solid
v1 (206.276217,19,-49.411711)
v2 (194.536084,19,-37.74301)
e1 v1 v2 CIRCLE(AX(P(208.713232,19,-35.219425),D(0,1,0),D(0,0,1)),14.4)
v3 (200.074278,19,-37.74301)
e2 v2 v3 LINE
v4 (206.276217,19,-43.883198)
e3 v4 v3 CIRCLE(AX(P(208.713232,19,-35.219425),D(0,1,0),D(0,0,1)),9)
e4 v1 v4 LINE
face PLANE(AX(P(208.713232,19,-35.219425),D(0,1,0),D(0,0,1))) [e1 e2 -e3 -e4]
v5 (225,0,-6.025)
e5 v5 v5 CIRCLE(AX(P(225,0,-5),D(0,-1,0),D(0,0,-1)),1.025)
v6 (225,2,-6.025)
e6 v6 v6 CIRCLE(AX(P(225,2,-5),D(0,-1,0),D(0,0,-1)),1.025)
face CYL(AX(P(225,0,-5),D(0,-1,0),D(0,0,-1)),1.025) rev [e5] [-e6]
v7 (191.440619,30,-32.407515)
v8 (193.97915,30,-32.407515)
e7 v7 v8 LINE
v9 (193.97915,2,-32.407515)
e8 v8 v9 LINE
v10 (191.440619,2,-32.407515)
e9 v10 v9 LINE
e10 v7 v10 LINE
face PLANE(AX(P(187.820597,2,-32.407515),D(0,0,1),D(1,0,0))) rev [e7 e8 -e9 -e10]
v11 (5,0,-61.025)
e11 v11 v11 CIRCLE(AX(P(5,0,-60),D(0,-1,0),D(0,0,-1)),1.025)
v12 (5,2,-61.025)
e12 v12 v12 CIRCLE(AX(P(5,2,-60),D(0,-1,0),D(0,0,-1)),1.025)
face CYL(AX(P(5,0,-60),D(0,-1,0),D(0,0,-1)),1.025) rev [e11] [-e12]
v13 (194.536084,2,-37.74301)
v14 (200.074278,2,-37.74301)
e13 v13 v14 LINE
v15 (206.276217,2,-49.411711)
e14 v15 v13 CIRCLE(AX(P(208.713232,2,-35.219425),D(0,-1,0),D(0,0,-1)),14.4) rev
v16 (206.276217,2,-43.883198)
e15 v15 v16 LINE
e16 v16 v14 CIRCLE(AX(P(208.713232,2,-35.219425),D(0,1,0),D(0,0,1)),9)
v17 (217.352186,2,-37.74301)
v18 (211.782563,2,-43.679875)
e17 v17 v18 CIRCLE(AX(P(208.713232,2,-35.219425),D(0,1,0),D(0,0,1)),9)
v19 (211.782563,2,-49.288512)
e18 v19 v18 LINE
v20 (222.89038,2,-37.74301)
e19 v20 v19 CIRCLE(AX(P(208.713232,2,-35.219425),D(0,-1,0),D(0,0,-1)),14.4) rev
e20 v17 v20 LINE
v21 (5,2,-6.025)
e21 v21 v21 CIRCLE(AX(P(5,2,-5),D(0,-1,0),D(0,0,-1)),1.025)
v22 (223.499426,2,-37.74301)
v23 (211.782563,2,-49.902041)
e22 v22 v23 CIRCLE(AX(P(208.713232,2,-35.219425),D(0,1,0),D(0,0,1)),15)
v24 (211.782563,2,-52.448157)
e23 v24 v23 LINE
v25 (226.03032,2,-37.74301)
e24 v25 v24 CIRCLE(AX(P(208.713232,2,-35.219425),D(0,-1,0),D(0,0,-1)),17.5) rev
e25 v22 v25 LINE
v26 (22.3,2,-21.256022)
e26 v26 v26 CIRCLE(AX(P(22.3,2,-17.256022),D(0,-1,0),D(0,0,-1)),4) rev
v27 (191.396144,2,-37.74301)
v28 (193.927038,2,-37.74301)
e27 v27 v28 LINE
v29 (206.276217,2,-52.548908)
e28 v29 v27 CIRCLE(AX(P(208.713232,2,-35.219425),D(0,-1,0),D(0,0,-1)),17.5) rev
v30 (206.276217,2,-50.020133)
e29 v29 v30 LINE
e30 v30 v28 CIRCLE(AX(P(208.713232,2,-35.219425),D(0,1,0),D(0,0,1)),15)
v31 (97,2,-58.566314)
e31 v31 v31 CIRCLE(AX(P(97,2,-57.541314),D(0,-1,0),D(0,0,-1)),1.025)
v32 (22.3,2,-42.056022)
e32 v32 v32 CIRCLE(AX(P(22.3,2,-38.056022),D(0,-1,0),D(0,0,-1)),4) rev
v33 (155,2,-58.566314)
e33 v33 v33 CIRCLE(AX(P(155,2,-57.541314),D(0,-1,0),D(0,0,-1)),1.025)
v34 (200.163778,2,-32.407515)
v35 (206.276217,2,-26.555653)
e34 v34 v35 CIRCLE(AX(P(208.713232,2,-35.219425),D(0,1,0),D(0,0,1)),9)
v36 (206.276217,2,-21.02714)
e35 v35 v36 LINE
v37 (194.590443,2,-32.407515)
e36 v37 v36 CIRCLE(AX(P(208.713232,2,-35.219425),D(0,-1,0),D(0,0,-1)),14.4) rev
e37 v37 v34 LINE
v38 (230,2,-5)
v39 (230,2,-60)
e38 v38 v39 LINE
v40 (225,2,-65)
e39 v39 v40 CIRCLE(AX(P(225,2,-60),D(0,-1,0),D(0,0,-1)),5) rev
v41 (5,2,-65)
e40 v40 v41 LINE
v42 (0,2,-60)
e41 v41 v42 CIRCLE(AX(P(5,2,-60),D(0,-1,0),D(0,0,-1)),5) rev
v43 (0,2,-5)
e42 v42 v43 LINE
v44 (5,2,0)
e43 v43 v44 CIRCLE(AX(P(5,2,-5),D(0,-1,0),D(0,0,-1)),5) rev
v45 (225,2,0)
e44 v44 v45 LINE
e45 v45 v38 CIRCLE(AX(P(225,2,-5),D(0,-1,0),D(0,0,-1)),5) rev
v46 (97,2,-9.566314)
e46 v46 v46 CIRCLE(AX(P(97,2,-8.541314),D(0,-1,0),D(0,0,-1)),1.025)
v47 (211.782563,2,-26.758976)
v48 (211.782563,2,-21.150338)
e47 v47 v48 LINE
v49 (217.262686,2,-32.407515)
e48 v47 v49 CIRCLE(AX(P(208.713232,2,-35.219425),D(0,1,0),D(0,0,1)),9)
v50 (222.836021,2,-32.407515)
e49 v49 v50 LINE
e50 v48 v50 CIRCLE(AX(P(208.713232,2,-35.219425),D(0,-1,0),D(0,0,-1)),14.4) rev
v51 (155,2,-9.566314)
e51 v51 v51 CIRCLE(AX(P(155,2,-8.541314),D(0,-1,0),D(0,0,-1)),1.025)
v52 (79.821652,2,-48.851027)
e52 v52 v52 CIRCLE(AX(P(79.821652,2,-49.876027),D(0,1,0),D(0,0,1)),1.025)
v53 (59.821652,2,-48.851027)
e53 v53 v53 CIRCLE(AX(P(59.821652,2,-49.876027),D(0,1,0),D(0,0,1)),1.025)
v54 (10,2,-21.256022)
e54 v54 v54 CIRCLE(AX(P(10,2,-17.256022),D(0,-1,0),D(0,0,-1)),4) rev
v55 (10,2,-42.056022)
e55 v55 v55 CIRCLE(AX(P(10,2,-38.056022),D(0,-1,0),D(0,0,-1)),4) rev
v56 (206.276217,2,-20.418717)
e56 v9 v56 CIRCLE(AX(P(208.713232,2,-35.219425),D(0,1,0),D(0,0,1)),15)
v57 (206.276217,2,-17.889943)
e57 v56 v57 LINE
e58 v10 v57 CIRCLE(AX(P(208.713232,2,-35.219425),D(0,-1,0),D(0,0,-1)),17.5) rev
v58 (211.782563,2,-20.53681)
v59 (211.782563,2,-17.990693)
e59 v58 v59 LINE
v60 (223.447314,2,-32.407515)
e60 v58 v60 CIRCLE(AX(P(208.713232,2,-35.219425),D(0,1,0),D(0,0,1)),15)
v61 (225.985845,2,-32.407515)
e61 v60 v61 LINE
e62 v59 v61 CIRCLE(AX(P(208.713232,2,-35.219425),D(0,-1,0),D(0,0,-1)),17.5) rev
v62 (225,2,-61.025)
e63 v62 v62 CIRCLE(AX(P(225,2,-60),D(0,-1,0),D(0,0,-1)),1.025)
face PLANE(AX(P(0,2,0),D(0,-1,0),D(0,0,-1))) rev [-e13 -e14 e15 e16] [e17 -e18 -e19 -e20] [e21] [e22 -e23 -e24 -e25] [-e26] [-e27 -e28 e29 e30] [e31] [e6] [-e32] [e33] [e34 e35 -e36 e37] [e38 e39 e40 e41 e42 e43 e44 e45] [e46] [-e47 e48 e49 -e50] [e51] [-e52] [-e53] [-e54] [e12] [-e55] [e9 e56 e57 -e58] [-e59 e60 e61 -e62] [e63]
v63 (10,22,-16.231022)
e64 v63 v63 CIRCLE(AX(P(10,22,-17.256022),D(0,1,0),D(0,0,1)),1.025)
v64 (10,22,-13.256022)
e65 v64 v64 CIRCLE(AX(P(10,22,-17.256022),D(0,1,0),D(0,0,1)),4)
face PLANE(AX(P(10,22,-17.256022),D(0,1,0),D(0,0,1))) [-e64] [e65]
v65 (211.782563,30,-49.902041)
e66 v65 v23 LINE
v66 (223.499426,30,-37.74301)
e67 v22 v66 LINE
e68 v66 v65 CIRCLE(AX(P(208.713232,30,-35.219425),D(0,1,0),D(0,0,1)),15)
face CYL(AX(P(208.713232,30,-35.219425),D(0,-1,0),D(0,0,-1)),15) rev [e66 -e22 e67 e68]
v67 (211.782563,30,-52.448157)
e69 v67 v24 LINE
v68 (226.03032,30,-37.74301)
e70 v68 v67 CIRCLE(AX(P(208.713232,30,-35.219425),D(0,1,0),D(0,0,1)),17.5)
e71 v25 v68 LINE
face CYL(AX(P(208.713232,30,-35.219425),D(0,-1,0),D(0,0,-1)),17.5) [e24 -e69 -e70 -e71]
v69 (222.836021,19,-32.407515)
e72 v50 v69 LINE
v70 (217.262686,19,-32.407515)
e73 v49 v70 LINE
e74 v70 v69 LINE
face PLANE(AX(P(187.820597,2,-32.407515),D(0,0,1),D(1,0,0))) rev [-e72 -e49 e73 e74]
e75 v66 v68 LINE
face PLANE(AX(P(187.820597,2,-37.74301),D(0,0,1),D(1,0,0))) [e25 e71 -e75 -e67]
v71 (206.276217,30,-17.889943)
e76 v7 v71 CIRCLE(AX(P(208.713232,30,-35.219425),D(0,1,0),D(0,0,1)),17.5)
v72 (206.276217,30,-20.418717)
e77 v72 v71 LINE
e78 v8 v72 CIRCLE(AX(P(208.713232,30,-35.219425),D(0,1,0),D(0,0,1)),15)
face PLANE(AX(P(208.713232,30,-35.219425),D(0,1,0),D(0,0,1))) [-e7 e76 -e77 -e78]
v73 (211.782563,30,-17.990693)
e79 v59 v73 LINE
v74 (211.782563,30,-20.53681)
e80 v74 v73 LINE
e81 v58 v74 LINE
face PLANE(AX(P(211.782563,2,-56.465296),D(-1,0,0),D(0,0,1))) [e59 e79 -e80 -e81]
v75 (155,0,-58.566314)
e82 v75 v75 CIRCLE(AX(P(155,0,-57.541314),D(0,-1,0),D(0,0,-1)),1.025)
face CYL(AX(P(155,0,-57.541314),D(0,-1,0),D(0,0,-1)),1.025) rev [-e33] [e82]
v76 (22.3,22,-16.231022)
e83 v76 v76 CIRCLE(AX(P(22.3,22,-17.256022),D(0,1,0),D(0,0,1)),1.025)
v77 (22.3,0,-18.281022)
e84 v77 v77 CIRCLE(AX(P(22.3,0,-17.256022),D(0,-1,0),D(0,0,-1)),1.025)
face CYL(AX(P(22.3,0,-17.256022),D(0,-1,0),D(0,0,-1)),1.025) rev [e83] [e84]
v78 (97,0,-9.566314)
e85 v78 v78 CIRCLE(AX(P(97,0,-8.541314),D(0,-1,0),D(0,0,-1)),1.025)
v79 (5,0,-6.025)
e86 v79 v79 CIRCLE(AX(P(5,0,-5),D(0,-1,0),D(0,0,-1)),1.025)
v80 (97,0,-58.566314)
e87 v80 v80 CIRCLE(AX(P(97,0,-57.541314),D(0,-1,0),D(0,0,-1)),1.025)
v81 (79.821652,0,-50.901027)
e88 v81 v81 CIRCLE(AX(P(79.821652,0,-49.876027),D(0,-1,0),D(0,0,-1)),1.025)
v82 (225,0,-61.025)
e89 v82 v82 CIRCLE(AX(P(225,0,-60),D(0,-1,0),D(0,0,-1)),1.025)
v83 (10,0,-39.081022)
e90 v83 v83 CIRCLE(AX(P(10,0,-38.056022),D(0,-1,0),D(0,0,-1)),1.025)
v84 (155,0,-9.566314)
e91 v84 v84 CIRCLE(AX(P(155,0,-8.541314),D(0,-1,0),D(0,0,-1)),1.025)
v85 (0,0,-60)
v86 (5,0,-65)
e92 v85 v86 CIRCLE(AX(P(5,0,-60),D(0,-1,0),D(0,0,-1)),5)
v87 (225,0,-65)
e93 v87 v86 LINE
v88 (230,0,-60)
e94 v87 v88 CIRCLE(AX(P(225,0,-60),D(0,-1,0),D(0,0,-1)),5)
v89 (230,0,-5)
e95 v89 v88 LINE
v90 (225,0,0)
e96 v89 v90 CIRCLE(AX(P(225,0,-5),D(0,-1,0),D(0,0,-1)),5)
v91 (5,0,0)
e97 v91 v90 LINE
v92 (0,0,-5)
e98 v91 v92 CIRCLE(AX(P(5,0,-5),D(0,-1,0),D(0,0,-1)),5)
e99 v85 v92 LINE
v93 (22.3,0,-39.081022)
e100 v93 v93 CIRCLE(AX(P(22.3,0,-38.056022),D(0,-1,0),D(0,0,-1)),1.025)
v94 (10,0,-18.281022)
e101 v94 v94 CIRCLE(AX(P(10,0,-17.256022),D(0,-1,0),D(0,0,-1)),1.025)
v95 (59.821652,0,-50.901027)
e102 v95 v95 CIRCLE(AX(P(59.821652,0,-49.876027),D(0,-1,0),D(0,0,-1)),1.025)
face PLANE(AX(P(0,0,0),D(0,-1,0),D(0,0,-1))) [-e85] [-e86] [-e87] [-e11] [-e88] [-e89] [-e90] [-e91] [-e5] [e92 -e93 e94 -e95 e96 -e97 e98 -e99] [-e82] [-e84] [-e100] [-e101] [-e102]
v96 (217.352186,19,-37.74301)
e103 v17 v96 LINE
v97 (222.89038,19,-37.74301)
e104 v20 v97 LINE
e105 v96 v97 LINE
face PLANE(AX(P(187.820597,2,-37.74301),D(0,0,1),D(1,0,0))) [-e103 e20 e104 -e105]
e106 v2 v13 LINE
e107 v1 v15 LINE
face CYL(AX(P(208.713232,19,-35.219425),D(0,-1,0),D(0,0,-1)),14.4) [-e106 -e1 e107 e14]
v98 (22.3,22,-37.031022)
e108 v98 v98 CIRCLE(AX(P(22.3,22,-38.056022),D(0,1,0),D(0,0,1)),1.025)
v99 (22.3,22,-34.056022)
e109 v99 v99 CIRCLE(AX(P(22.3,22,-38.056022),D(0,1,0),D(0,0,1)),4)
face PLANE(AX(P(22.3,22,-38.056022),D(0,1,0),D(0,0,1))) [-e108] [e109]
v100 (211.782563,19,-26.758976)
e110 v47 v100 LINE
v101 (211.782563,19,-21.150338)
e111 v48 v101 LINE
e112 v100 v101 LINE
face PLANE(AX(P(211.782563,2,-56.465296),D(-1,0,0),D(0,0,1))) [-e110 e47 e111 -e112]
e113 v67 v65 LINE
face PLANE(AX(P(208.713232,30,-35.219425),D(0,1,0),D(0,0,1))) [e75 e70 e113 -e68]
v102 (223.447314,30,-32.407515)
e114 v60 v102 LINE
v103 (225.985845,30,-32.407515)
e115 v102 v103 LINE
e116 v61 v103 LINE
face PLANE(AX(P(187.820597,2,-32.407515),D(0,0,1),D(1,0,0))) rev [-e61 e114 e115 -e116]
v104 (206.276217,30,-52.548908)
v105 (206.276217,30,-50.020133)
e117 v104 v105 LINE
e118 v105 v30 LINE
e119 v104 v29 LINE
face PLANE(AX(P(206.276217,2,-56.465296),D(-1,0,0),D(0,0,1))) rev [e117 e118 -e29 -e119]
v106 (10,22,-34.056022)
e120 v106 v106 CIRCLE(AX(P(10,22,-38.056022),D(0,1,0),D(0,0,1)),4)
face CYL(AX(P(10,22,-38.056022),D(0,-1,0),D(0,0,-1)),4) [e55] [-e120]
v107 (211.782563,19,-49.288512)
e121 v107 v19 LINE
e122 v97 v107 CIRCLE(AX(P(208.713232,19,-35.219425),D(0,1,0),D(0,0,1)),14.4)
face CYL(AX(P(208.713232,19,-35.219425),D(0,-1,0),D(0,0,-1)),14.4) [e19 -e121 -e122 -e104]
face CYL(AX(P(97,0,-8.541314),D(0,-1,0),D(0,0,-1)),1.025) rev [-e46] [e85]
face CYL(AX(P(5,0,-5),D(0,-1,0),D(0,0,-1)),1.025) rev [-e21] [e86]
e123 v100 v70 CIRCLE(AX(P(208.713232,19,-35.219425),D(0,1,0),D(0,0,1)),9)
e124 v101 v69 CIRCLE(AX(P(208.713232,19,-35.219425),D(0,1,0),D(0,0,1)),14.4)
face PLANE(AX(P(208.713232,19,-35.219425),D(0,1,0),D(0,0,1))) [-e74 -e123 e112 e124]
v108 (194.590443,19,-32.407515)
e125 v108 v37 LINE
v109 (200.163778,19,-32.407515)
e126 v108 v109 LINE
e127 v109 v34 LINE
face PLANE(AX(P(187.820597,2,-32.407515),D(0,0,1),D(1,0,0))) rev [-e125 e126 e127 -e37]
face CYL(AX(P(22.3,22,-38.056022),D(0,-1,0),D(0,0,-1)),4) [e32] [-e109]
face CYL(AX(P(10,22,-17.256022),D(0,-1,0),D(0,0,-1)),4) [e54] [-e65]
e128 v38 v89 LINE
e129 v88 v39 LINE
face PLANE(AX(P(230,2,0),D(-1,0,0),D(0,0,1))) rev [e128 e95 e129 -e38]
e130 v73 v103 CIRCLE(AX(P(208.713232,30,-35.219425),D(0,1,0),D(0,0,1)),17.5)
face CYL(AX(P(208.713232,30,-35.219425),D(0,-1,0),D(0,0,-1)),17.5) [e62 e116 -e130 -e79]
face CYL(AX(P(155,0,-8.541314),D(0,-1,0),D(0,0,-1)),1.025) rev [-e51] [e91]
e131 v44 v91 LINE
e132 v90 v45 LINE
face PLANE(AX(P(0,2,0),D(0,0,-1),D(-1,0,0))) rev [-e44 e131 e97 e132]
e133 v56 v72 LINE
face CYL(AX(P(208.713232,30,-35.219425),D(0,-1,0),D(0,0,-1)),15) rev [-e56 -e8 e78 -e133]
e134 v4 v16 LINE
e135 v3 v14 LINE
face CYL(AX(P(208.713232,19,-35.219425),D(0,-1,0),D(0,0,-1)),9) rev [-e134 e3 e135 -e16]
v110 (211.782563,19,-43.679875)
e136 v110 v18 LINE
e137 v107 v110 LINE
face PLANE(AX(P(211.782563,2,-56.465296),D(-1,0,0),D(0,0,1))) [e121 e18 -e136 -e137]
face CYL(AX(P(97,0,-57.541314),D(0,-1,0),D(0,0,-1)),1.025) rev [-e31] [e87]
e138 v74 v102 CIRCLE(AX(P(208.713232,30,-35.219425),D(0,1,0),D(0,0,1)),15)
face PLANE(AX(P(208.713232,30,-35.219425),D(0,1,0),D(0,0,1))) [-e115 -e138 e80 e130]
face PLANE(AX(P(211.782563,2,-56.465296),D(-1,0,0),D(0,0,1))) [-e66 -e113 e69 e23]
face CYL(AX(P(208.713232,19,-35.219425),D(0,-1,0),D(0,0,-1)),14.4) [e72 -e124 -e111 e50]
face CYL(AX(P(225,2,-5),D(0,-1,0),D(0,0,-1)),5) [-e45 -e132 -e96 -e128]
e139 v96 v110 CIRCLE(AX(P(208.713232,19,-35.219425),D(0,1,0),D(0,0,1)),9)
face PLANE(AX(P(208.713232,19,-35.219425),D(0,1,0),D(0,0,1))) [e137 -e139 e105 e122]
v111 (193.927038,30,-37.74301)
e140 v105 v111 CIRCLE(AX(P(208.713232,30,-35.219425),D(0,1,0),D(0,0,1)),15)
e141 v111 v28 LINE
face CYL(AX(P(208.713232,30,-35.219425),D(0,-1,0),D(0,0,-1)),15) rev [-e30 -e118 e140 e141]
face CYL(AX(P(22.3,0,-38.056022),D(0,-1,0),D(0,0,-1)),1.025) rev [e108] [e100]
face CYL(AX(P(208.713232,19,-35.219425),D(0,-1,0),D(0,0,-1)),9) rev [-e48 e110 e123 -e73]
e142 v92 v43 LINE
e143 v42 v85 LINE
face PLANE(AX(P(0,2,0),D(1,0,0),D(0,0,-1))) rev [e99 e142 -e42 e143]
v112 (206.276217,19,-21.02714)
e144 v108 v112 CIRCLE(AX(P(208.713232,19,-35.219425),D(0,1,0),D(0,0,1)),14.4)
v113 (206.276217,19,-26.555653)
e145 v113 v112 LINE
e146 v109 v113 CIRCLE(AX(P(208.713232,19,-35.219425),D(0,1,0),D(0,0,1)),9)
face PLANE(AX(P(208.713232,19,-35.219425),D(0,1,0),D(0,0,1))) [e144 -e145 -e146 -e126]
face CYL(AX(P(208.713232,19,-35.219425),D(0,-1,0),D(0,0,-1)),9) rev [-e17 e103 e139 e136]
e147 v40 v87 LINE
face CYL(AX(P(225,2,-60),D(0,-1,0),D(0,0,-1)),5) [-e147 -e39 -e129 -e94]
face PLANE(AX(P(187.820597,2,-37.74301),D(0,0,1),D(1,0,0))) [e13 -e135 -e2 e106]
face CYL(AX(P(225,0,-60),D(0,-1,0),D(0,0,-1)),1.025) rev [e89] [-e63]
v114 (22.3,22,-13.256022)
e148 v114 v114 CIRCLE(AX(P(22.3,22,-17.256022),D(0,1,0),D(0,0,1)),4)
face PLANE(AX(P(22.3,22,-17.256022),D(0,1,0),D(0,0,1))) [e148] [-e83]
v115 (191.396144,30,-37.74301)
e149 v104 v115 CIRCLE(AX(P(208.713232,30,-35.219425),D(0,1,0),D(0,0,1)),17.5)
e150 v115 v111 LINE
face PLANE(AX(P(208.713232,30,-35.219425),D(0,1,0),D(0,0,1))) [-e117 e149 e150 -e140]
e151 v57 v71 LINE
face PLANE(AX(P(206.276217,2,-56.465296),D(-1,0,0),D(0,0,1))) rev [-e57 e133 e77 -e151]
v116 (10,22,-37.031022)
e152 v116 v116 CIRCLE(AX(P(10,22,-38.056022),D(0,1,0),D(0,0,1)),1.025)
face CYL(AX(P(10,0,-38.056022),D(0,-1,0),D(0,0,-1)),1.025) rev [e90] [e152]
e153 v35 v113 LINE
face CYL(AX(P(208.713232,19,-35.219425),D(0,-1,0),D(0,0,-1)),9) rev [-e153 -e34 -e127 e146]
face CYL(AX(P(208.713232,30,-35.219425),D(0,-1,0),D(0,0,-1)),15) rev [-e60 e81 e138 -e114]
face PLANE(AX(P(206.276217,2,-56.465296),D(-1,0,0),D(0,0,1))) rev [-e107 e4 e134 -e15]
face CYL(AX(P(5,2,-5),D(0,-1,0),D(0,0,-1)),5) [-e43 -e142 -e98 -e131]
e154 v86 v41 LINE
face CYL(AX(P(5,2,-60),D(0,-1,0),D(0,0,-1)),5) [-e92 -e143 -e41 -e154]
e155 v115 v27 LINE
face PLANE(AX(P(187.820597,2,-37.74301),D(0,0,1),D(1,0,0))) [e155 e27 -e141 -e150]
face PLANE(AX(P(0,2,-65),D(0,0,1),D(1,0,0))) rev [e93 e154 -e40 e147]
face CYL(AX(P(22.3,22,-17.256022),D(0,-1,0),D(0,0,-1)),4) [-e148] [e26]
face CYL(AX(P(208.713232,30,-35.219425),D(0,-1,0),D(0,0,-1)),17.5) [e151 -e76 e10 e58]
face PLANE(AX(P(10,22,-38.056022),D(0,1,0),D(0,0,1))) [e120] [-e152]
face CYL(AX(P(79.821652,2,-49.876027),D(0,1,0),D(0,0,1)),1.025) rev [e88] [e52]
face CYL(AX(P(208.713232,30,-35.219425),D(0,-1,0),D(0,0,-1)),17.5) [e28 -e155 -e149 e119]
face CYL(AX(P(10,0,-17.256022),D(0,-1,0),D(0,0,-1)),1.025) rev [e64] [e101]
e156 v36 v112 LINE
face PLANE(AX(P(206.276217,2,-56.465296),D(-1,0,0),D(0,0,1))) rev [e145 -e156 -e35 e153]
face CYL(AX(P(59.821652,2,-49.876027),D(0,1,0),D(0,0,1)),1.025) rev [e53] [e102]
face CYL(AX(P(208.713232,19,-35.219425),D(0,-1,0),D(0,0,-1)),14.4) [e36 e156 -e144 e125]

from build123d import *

# Parameters (mm, degrees)
SKETCH1_W                   = 230
SKETCH1_H                   = 65
BOSS_EXTRUDE1_DEPTH         = 2
M2_5_TAPPED_HOLE1_D         = 2.05
M2_5_TAPPED_HOLE1_DEPTH     = 2.5
M2_5_TAPPED_HOLE1_TIP       = 0.615882135
M2_5_TAPPED_HOLE2_D         = 2.05
M2_5_TAPPED_HOLE2_DEPTH     = 6.35
M2_5_TAPPED_HOLE2_TIP       = 0.615882135
SKETCH12_R                  = 4
BOSS_EXTRUDE4_DEPTH         = 20
FILLET1_R                   = 5
M2_5_TAPPED_HOLE3_D         = 2.05
M2_5_TAPPED_HOLE3_DEPTH     = 6.35
M2_5_TAPPED_HOLE3_TIP       = 0.615882135
M2_5_START                  = 2
M2_5_TAPPED_HOLE4_OUTLINE_R = 1.025
M2_5_TAPPED_HOLE4_DEPTH     = 20
M2_5_TAPPED_HOLE4_2_DEPTH   = 17
M2_5_START_2                = 19
M2_5_TAPPED_HOLE4_3_DEPTH   = 11
M2_5_TAPPED_HOLE5_OUTLINE_R = 1.025
M2_5_TAPPED_HOLE5_DEPTH     = 2


# Read off the part's stored shape, not the designer's step: M2.5 Tapped Hole4, M2.5 Tapped Hole5
with BuildPart() as part:
    # Sketch1 → Boss-Extrude1 (new body)
    with BuildSketch(Plane(origin=(0, 0, 0), x_dir=(1, 0, 0), z_dir=(0, 1, 0))):
        with Locations((115, 32.5)):
            Rectangle(SKETCH1_W, SKETCH1_H)
    extrude(amount=BOSS_EXTRUDE1_DEPTH)

    # M2.5 Tapped Hole1
    with Locations(Plane(origin=(0, 0, 0), x_dir=(-1, 0, 0), z_dir=(0, -1, 0))):
        with Locations((-97, 8.54131446), (-97, 57.54131446), (-155, 57.54131446), (-155, 8.54131446)):
            Hole(M2_5_TAPPED_HOLE1_D / 2, depth=M2_5_TAPPED_HOLE1_DEPTH)
            with Locations((0, 0, -(M2_5_TAPPED_HOLE1_DEPTH + M2_5_TAPPED_HOLE1_TIP / 2))):  # 118° drill point
                Cone(0, M2_5_TAPPED_HOLE1_D / 2, M2_5_TAPPED_HOLE1_TIP, mode=Mode.SUBTRACT)

    # M2.5 Tapped Hole2
    with Locations(Plane(origin=(0, 0, 0), x_dir=(-1, 0, 0), z_dir=(0, -1, 0))):
        with Locations((-10, 17.256022479), (-22.3, 17.256022479), (-22.3, 38.056022479), (-10, 38.056022479)):
            Hole(M2_5_TAPPED_HOLE2_D / 2, depth=M2_5_TAPPED_HOLE2_DEPTH)
            with Locations((0, 0, -(M2_5_TAPPED_HOLE2_DEPTH + M2_5_TAPPED_HOLE2_TIP / 2))):  # 118° drill point
                Cone(0, M2_5_TAPPED_HOLE2_D / 2, M2_5_TAPPED_HOLE2_TIP, mode=Mode.SUBTRACT)

    # Sketch12 → Boss-Extrude4 (add)
    with BuildSketch(Plane(origin=(0, 2, 0), x_dir=(1, 0, 0), z_dir=(0, 1, 0))):
        with Locations(Location((10, 38.056022479, 0), (0, 0, 90))):
            Circle(SKETCH12_R)
        with Locations(Location((22.3, 38.056022479, 0), (0, 0, 90))):
            Circle(SKETCH12_R)
        with Locations(Location((10, 17.256022479, 0), (0, 0, 90))):
            Circle(SKETCH12_R)
        with Locations(Location((22.3, 17.256022479, 0), (0, 0, 90))):
            Circle(SKETCH12_R)
    extrude(amount=BOSS_EXTRUDE4_DEPTH)

    # Fillet1
    fillet1_edges = [part.edges().sort_by_distance(p)[0] for p in [
        (0, 1, -65),
        (230, 1, -65),
        (230, 1, 0),
        (0, 1, 0),
    ]]
    fillet(fillet1_edges, radius=FILLET1_R)

    # M2.5 Tapped Hole3
    with Locations(Plane(origin=(5, 0, -5), x_dir=(0, 0, -1), z_dir=(0, -1, 0))):
        with Locations((0, 0), (0, 220), (55, 220), (55, 0)):
            Hole(M2_5_TAPPED_HOLE3_D / 2, depth=M2_5_TAPPED_HOLE3_DEPTH)
            with Locations((0, 0, -(M2_5_TAPPED_HOLE3_DEPTH + M2_5_TAPPED_HOLE3_TIP / 2))):  # 118° drill point
                Cone(0, M2_5_TAPPED_HOLE3_D / 2, M2_5_TAPPED_HOLE3_TIP, mode=Mode.SUBTRACT)

    # M2.5 Tapped Hole4 outline → M2.5 Tapped Hole4 (cut)
    with BuildSketch(Plane(origin=(0, 0, 0), x_dir=(1, 0, 0), z_dir=(0, 1, 0)).offset(M2_5_START)):
        with Locations((10, 38.056022479)):
            Circle(M2_5_TAPPED_HOLE4_OUTLINE_R)
        with Locations((22.3, 38.056022479)):
            Circle(M2_5_TAPPED_HOLE4_OUTLINE_R)
        with Locations((22.3, 17.256022479)):
            Circle(M2_5_TAPPED_HOLE4_OUTLINE_R)
        with Locations((10, 17.256022479)):
            Circle(M2_5_TAPPED_HOLE4_OUTLINE_R)
    extrude(amount=M2_5_TAPPED_HOLE4_DEPTH, mode=Mode.SUBTRACT)

    # M2.5 Tapped Hole4 2 outline → M2.5 Tapped Hole4 2 (add)
    with BuildSketch(Plane(origin=(0, 0, 0), x_dir=(1, 0, 0), z_dir=(0, 1, 0)).offset(M2_5_START)):
        with BuildLine():
            ThreePointArc((211.782562929, 17.990693318), (221.179581033, 22.937725916), (225.985844998, 32.407515116))
            Line((225.985844998, 32.407515116), (223.447313577, 32.407515116))
            ThreePointArc((223.447313577, 32.407515116), (219.412240688, 24.706042811), (211.782562929, 20.536809526))
            Line((211.782562929, 20.536809526), (211.782562929, 17.990693318))
        make_face()
        with BuildLine():
            ThreePointArc((226.030319518, 37.74300987), (221.281519671, 47.396787308), (211.782562929, 52.448157384))
            Line((211.782562929, 52.448157384), (211.782562929, 49.902041176))
            ThreePointArc((211.782562929, 49.902041176), (219.514410141, 45.6278138), (223.499425569, 37.74300987))
            Line((223.499425569, 37.74300987), (226.030319518, 37.74300987))
        make_face()
        with BuildLine():
            ThreePointArc((206.276217111, 52.548907703), (196.36982105, 47.624674517), (191.39614442, 37.74300987))
            Line((191.39614442, 37.74300987), (193.927038369, 37.74300987))
            ThreePointArc((193.927038369, 37.74300987), (198.137709859, 45.857015872), (206.276217111, 50.020133394))
            Line((206.276217111, 50.020133394), (206.276217111, 52.548907703))
        make_face()
        with BuildLine():
            ThreePointArc((191.440618941, 32.407515116), (196.473651384, 22.711721041), (206.276217111, 17.889942999))
            Line((206.276217111, 17.889942999), (206.276217111, 20.418717308))
            ThreePointArc((206.276217111, 20.418717308), (198.242107068, 24.479055557), (193.979150361, 32.407515116))
            Line((193.979150361, 32.407515116), (191.440618941, 32.407515116))
        make_face()
        with BuildLine():
            ThreePointArc((211.782562929, 21.150338406), (218.988116471, 25.13048346), (222.836020675, 32.407515116))
            Line((222.836020675, 32.407515116), (217.262685801, 32.407515116))
            ThreePointArc((217.262685801, 32.407515116), (215.172762854, 28.952491432), (211.782562929, 26.758975749))
            Line((211.782562929, 26.758975749), (211.782562929, 21.150338406))
        make_face()
        with BuildLine():
            ThreePointArc((222.89037982, 37.74300987), (219.090366179, 45.203166413), (211.782562929, 49.288512296))
            Line((211.782562929, 49.288512296), (211.782562929, 43.679874952))
            ThreePointArc((211.782562929, 43.679874952), (215.276963699, 41.377138058), (217.352185678, 37.74300987))
            Line((217.352185678, 37.74300987), (222.89037982, 37.74300987))
        make_face()
        with BuildLine():
            ThreePointArc((206.276217111, 49.411710529), (198.562013106, 45.432786972), (194.536084119, 37.74300987))
            Line((194.536084119, 37.74300987), (200.074278261, 37.74300987))
            ThreePointArc((200.074278261, 37.74300987), (202.381190604, 41.615146745), (206.276217111, 43.883198119))
            Line((206.276217111, 43.883198119), (206.276217111, 49.411710529))
        make_face()
        with BuildLine():
            ThreePointArc((194.590443263, 32.407515116), (198.666590392, 24.903176371), (206.276217111, 21.027140173))
            Line((206.276217111, 21.027140173), (206.276217111, 26.555652583))
            ThreePointArc((206.276217111, 26.555652583), (202.489350756, 28.718402151), (200.163778137, 32.407515116))
            Line((200.163778137, 32.407515116), (194.590443263, 32.407515116))
        make_face()
    extrude(amount=M2_5_TAPPED_HOLE4_2_DEPTH)

    # M2.5 Tapped Hole4 3 outline → M2.5 Tapped Hole4 3 (add)
    with BuildSketch(Plane(origin=(0, 0, 0), x_dir=(1, 0, 0), z_dir=(0, 1, 0)).offset(M2_5_START_2)):
        with BuildLine():
            ThreePointArc((211.782562929, 17.990693318), (221.179581033, 22.937725916), (225.985844998, 32.407515116))
            Line((225.985844998, 32.407515116), (223.447313577, 32.407515116))
            ThreePointArc((223.447313577, 32.407515116), (219.412240688, 24.706042811), (211.782562929, 20.536809526))
            Line((211.782562929, 20.536809526), (211.782562929, 17.990693318))
        make_face()
        with BuildLine():
            ThreePointArc((226.030319518, 37.74300987), (221.281519671, 47.396787308), (211.782562929, 52.448157384))
            Line((211.782562929, 52.448157384), (211.782562929, 49.902041176))
            ThreePointArc((211.782562929, 49.902041176), (219.514410141, 45.6278138), (223.499425569, 37.74300987))
            Line((223.499425569, 37.74300987), (226.030319518, 37.74300987))
        make_face()
        with BuildLine():
            ThreePointArc((206.276217111, 52.548907703), (196.36982105, 47.624674517), (191.39614442, 37.74300987))
            Line((191.39614442, 37.74300987), (193.927038369, 37.74300987))
            ThreePointArc((193.927038369, 37.74300987), (198.137709859, 45.857015872), (206.276217111, 50.020133394))
            Line((206.276217111, 50.020133394), (206.276217111, 52.548907703))
        make_face()
        with BuildLine():
            ThreePointArc((191.440618941, 32.407515116), (196.473651384, 22.711721041), (206.276217111, 17.889942999))
            Line((206.276217111, 17.889942999), (206.276217111, 20.418717308))
            ThreePointArc((206.276217111, 20.418717308), (198.242107068, 24.479055557), (193.979150361, 32.407515116))
            Line((193.979150361, 32.407515116), (191.440618941, 32.407515116))
        make_face()
    extrude(amount=M2_5_TAPPED_HOLE4_3_DEPTH)

    # M2.5 Tapped Hole5 outline → M2.5 Tapped Hole5 (cut)
    with BuildSketch(Plane(origin=(0, 0, 0), x_dir=(1, 0, 0), z_dir=(0, 1, 0))):
        with Locations((79.821651761, 49.876027086)):
            Circle(M2_5_TAPPED_HOLE5_OUTLINE_R)
        with Locations((59.821651761, 49.876027086)):
            Circle(M2_5_TAPPED_HOLE5_OUTLINE_R)
    extrude(amount=M2_5_TAPPED_HOLE5_DEPTH, mode=Mode.SUBTRACT)


solid = part.part
